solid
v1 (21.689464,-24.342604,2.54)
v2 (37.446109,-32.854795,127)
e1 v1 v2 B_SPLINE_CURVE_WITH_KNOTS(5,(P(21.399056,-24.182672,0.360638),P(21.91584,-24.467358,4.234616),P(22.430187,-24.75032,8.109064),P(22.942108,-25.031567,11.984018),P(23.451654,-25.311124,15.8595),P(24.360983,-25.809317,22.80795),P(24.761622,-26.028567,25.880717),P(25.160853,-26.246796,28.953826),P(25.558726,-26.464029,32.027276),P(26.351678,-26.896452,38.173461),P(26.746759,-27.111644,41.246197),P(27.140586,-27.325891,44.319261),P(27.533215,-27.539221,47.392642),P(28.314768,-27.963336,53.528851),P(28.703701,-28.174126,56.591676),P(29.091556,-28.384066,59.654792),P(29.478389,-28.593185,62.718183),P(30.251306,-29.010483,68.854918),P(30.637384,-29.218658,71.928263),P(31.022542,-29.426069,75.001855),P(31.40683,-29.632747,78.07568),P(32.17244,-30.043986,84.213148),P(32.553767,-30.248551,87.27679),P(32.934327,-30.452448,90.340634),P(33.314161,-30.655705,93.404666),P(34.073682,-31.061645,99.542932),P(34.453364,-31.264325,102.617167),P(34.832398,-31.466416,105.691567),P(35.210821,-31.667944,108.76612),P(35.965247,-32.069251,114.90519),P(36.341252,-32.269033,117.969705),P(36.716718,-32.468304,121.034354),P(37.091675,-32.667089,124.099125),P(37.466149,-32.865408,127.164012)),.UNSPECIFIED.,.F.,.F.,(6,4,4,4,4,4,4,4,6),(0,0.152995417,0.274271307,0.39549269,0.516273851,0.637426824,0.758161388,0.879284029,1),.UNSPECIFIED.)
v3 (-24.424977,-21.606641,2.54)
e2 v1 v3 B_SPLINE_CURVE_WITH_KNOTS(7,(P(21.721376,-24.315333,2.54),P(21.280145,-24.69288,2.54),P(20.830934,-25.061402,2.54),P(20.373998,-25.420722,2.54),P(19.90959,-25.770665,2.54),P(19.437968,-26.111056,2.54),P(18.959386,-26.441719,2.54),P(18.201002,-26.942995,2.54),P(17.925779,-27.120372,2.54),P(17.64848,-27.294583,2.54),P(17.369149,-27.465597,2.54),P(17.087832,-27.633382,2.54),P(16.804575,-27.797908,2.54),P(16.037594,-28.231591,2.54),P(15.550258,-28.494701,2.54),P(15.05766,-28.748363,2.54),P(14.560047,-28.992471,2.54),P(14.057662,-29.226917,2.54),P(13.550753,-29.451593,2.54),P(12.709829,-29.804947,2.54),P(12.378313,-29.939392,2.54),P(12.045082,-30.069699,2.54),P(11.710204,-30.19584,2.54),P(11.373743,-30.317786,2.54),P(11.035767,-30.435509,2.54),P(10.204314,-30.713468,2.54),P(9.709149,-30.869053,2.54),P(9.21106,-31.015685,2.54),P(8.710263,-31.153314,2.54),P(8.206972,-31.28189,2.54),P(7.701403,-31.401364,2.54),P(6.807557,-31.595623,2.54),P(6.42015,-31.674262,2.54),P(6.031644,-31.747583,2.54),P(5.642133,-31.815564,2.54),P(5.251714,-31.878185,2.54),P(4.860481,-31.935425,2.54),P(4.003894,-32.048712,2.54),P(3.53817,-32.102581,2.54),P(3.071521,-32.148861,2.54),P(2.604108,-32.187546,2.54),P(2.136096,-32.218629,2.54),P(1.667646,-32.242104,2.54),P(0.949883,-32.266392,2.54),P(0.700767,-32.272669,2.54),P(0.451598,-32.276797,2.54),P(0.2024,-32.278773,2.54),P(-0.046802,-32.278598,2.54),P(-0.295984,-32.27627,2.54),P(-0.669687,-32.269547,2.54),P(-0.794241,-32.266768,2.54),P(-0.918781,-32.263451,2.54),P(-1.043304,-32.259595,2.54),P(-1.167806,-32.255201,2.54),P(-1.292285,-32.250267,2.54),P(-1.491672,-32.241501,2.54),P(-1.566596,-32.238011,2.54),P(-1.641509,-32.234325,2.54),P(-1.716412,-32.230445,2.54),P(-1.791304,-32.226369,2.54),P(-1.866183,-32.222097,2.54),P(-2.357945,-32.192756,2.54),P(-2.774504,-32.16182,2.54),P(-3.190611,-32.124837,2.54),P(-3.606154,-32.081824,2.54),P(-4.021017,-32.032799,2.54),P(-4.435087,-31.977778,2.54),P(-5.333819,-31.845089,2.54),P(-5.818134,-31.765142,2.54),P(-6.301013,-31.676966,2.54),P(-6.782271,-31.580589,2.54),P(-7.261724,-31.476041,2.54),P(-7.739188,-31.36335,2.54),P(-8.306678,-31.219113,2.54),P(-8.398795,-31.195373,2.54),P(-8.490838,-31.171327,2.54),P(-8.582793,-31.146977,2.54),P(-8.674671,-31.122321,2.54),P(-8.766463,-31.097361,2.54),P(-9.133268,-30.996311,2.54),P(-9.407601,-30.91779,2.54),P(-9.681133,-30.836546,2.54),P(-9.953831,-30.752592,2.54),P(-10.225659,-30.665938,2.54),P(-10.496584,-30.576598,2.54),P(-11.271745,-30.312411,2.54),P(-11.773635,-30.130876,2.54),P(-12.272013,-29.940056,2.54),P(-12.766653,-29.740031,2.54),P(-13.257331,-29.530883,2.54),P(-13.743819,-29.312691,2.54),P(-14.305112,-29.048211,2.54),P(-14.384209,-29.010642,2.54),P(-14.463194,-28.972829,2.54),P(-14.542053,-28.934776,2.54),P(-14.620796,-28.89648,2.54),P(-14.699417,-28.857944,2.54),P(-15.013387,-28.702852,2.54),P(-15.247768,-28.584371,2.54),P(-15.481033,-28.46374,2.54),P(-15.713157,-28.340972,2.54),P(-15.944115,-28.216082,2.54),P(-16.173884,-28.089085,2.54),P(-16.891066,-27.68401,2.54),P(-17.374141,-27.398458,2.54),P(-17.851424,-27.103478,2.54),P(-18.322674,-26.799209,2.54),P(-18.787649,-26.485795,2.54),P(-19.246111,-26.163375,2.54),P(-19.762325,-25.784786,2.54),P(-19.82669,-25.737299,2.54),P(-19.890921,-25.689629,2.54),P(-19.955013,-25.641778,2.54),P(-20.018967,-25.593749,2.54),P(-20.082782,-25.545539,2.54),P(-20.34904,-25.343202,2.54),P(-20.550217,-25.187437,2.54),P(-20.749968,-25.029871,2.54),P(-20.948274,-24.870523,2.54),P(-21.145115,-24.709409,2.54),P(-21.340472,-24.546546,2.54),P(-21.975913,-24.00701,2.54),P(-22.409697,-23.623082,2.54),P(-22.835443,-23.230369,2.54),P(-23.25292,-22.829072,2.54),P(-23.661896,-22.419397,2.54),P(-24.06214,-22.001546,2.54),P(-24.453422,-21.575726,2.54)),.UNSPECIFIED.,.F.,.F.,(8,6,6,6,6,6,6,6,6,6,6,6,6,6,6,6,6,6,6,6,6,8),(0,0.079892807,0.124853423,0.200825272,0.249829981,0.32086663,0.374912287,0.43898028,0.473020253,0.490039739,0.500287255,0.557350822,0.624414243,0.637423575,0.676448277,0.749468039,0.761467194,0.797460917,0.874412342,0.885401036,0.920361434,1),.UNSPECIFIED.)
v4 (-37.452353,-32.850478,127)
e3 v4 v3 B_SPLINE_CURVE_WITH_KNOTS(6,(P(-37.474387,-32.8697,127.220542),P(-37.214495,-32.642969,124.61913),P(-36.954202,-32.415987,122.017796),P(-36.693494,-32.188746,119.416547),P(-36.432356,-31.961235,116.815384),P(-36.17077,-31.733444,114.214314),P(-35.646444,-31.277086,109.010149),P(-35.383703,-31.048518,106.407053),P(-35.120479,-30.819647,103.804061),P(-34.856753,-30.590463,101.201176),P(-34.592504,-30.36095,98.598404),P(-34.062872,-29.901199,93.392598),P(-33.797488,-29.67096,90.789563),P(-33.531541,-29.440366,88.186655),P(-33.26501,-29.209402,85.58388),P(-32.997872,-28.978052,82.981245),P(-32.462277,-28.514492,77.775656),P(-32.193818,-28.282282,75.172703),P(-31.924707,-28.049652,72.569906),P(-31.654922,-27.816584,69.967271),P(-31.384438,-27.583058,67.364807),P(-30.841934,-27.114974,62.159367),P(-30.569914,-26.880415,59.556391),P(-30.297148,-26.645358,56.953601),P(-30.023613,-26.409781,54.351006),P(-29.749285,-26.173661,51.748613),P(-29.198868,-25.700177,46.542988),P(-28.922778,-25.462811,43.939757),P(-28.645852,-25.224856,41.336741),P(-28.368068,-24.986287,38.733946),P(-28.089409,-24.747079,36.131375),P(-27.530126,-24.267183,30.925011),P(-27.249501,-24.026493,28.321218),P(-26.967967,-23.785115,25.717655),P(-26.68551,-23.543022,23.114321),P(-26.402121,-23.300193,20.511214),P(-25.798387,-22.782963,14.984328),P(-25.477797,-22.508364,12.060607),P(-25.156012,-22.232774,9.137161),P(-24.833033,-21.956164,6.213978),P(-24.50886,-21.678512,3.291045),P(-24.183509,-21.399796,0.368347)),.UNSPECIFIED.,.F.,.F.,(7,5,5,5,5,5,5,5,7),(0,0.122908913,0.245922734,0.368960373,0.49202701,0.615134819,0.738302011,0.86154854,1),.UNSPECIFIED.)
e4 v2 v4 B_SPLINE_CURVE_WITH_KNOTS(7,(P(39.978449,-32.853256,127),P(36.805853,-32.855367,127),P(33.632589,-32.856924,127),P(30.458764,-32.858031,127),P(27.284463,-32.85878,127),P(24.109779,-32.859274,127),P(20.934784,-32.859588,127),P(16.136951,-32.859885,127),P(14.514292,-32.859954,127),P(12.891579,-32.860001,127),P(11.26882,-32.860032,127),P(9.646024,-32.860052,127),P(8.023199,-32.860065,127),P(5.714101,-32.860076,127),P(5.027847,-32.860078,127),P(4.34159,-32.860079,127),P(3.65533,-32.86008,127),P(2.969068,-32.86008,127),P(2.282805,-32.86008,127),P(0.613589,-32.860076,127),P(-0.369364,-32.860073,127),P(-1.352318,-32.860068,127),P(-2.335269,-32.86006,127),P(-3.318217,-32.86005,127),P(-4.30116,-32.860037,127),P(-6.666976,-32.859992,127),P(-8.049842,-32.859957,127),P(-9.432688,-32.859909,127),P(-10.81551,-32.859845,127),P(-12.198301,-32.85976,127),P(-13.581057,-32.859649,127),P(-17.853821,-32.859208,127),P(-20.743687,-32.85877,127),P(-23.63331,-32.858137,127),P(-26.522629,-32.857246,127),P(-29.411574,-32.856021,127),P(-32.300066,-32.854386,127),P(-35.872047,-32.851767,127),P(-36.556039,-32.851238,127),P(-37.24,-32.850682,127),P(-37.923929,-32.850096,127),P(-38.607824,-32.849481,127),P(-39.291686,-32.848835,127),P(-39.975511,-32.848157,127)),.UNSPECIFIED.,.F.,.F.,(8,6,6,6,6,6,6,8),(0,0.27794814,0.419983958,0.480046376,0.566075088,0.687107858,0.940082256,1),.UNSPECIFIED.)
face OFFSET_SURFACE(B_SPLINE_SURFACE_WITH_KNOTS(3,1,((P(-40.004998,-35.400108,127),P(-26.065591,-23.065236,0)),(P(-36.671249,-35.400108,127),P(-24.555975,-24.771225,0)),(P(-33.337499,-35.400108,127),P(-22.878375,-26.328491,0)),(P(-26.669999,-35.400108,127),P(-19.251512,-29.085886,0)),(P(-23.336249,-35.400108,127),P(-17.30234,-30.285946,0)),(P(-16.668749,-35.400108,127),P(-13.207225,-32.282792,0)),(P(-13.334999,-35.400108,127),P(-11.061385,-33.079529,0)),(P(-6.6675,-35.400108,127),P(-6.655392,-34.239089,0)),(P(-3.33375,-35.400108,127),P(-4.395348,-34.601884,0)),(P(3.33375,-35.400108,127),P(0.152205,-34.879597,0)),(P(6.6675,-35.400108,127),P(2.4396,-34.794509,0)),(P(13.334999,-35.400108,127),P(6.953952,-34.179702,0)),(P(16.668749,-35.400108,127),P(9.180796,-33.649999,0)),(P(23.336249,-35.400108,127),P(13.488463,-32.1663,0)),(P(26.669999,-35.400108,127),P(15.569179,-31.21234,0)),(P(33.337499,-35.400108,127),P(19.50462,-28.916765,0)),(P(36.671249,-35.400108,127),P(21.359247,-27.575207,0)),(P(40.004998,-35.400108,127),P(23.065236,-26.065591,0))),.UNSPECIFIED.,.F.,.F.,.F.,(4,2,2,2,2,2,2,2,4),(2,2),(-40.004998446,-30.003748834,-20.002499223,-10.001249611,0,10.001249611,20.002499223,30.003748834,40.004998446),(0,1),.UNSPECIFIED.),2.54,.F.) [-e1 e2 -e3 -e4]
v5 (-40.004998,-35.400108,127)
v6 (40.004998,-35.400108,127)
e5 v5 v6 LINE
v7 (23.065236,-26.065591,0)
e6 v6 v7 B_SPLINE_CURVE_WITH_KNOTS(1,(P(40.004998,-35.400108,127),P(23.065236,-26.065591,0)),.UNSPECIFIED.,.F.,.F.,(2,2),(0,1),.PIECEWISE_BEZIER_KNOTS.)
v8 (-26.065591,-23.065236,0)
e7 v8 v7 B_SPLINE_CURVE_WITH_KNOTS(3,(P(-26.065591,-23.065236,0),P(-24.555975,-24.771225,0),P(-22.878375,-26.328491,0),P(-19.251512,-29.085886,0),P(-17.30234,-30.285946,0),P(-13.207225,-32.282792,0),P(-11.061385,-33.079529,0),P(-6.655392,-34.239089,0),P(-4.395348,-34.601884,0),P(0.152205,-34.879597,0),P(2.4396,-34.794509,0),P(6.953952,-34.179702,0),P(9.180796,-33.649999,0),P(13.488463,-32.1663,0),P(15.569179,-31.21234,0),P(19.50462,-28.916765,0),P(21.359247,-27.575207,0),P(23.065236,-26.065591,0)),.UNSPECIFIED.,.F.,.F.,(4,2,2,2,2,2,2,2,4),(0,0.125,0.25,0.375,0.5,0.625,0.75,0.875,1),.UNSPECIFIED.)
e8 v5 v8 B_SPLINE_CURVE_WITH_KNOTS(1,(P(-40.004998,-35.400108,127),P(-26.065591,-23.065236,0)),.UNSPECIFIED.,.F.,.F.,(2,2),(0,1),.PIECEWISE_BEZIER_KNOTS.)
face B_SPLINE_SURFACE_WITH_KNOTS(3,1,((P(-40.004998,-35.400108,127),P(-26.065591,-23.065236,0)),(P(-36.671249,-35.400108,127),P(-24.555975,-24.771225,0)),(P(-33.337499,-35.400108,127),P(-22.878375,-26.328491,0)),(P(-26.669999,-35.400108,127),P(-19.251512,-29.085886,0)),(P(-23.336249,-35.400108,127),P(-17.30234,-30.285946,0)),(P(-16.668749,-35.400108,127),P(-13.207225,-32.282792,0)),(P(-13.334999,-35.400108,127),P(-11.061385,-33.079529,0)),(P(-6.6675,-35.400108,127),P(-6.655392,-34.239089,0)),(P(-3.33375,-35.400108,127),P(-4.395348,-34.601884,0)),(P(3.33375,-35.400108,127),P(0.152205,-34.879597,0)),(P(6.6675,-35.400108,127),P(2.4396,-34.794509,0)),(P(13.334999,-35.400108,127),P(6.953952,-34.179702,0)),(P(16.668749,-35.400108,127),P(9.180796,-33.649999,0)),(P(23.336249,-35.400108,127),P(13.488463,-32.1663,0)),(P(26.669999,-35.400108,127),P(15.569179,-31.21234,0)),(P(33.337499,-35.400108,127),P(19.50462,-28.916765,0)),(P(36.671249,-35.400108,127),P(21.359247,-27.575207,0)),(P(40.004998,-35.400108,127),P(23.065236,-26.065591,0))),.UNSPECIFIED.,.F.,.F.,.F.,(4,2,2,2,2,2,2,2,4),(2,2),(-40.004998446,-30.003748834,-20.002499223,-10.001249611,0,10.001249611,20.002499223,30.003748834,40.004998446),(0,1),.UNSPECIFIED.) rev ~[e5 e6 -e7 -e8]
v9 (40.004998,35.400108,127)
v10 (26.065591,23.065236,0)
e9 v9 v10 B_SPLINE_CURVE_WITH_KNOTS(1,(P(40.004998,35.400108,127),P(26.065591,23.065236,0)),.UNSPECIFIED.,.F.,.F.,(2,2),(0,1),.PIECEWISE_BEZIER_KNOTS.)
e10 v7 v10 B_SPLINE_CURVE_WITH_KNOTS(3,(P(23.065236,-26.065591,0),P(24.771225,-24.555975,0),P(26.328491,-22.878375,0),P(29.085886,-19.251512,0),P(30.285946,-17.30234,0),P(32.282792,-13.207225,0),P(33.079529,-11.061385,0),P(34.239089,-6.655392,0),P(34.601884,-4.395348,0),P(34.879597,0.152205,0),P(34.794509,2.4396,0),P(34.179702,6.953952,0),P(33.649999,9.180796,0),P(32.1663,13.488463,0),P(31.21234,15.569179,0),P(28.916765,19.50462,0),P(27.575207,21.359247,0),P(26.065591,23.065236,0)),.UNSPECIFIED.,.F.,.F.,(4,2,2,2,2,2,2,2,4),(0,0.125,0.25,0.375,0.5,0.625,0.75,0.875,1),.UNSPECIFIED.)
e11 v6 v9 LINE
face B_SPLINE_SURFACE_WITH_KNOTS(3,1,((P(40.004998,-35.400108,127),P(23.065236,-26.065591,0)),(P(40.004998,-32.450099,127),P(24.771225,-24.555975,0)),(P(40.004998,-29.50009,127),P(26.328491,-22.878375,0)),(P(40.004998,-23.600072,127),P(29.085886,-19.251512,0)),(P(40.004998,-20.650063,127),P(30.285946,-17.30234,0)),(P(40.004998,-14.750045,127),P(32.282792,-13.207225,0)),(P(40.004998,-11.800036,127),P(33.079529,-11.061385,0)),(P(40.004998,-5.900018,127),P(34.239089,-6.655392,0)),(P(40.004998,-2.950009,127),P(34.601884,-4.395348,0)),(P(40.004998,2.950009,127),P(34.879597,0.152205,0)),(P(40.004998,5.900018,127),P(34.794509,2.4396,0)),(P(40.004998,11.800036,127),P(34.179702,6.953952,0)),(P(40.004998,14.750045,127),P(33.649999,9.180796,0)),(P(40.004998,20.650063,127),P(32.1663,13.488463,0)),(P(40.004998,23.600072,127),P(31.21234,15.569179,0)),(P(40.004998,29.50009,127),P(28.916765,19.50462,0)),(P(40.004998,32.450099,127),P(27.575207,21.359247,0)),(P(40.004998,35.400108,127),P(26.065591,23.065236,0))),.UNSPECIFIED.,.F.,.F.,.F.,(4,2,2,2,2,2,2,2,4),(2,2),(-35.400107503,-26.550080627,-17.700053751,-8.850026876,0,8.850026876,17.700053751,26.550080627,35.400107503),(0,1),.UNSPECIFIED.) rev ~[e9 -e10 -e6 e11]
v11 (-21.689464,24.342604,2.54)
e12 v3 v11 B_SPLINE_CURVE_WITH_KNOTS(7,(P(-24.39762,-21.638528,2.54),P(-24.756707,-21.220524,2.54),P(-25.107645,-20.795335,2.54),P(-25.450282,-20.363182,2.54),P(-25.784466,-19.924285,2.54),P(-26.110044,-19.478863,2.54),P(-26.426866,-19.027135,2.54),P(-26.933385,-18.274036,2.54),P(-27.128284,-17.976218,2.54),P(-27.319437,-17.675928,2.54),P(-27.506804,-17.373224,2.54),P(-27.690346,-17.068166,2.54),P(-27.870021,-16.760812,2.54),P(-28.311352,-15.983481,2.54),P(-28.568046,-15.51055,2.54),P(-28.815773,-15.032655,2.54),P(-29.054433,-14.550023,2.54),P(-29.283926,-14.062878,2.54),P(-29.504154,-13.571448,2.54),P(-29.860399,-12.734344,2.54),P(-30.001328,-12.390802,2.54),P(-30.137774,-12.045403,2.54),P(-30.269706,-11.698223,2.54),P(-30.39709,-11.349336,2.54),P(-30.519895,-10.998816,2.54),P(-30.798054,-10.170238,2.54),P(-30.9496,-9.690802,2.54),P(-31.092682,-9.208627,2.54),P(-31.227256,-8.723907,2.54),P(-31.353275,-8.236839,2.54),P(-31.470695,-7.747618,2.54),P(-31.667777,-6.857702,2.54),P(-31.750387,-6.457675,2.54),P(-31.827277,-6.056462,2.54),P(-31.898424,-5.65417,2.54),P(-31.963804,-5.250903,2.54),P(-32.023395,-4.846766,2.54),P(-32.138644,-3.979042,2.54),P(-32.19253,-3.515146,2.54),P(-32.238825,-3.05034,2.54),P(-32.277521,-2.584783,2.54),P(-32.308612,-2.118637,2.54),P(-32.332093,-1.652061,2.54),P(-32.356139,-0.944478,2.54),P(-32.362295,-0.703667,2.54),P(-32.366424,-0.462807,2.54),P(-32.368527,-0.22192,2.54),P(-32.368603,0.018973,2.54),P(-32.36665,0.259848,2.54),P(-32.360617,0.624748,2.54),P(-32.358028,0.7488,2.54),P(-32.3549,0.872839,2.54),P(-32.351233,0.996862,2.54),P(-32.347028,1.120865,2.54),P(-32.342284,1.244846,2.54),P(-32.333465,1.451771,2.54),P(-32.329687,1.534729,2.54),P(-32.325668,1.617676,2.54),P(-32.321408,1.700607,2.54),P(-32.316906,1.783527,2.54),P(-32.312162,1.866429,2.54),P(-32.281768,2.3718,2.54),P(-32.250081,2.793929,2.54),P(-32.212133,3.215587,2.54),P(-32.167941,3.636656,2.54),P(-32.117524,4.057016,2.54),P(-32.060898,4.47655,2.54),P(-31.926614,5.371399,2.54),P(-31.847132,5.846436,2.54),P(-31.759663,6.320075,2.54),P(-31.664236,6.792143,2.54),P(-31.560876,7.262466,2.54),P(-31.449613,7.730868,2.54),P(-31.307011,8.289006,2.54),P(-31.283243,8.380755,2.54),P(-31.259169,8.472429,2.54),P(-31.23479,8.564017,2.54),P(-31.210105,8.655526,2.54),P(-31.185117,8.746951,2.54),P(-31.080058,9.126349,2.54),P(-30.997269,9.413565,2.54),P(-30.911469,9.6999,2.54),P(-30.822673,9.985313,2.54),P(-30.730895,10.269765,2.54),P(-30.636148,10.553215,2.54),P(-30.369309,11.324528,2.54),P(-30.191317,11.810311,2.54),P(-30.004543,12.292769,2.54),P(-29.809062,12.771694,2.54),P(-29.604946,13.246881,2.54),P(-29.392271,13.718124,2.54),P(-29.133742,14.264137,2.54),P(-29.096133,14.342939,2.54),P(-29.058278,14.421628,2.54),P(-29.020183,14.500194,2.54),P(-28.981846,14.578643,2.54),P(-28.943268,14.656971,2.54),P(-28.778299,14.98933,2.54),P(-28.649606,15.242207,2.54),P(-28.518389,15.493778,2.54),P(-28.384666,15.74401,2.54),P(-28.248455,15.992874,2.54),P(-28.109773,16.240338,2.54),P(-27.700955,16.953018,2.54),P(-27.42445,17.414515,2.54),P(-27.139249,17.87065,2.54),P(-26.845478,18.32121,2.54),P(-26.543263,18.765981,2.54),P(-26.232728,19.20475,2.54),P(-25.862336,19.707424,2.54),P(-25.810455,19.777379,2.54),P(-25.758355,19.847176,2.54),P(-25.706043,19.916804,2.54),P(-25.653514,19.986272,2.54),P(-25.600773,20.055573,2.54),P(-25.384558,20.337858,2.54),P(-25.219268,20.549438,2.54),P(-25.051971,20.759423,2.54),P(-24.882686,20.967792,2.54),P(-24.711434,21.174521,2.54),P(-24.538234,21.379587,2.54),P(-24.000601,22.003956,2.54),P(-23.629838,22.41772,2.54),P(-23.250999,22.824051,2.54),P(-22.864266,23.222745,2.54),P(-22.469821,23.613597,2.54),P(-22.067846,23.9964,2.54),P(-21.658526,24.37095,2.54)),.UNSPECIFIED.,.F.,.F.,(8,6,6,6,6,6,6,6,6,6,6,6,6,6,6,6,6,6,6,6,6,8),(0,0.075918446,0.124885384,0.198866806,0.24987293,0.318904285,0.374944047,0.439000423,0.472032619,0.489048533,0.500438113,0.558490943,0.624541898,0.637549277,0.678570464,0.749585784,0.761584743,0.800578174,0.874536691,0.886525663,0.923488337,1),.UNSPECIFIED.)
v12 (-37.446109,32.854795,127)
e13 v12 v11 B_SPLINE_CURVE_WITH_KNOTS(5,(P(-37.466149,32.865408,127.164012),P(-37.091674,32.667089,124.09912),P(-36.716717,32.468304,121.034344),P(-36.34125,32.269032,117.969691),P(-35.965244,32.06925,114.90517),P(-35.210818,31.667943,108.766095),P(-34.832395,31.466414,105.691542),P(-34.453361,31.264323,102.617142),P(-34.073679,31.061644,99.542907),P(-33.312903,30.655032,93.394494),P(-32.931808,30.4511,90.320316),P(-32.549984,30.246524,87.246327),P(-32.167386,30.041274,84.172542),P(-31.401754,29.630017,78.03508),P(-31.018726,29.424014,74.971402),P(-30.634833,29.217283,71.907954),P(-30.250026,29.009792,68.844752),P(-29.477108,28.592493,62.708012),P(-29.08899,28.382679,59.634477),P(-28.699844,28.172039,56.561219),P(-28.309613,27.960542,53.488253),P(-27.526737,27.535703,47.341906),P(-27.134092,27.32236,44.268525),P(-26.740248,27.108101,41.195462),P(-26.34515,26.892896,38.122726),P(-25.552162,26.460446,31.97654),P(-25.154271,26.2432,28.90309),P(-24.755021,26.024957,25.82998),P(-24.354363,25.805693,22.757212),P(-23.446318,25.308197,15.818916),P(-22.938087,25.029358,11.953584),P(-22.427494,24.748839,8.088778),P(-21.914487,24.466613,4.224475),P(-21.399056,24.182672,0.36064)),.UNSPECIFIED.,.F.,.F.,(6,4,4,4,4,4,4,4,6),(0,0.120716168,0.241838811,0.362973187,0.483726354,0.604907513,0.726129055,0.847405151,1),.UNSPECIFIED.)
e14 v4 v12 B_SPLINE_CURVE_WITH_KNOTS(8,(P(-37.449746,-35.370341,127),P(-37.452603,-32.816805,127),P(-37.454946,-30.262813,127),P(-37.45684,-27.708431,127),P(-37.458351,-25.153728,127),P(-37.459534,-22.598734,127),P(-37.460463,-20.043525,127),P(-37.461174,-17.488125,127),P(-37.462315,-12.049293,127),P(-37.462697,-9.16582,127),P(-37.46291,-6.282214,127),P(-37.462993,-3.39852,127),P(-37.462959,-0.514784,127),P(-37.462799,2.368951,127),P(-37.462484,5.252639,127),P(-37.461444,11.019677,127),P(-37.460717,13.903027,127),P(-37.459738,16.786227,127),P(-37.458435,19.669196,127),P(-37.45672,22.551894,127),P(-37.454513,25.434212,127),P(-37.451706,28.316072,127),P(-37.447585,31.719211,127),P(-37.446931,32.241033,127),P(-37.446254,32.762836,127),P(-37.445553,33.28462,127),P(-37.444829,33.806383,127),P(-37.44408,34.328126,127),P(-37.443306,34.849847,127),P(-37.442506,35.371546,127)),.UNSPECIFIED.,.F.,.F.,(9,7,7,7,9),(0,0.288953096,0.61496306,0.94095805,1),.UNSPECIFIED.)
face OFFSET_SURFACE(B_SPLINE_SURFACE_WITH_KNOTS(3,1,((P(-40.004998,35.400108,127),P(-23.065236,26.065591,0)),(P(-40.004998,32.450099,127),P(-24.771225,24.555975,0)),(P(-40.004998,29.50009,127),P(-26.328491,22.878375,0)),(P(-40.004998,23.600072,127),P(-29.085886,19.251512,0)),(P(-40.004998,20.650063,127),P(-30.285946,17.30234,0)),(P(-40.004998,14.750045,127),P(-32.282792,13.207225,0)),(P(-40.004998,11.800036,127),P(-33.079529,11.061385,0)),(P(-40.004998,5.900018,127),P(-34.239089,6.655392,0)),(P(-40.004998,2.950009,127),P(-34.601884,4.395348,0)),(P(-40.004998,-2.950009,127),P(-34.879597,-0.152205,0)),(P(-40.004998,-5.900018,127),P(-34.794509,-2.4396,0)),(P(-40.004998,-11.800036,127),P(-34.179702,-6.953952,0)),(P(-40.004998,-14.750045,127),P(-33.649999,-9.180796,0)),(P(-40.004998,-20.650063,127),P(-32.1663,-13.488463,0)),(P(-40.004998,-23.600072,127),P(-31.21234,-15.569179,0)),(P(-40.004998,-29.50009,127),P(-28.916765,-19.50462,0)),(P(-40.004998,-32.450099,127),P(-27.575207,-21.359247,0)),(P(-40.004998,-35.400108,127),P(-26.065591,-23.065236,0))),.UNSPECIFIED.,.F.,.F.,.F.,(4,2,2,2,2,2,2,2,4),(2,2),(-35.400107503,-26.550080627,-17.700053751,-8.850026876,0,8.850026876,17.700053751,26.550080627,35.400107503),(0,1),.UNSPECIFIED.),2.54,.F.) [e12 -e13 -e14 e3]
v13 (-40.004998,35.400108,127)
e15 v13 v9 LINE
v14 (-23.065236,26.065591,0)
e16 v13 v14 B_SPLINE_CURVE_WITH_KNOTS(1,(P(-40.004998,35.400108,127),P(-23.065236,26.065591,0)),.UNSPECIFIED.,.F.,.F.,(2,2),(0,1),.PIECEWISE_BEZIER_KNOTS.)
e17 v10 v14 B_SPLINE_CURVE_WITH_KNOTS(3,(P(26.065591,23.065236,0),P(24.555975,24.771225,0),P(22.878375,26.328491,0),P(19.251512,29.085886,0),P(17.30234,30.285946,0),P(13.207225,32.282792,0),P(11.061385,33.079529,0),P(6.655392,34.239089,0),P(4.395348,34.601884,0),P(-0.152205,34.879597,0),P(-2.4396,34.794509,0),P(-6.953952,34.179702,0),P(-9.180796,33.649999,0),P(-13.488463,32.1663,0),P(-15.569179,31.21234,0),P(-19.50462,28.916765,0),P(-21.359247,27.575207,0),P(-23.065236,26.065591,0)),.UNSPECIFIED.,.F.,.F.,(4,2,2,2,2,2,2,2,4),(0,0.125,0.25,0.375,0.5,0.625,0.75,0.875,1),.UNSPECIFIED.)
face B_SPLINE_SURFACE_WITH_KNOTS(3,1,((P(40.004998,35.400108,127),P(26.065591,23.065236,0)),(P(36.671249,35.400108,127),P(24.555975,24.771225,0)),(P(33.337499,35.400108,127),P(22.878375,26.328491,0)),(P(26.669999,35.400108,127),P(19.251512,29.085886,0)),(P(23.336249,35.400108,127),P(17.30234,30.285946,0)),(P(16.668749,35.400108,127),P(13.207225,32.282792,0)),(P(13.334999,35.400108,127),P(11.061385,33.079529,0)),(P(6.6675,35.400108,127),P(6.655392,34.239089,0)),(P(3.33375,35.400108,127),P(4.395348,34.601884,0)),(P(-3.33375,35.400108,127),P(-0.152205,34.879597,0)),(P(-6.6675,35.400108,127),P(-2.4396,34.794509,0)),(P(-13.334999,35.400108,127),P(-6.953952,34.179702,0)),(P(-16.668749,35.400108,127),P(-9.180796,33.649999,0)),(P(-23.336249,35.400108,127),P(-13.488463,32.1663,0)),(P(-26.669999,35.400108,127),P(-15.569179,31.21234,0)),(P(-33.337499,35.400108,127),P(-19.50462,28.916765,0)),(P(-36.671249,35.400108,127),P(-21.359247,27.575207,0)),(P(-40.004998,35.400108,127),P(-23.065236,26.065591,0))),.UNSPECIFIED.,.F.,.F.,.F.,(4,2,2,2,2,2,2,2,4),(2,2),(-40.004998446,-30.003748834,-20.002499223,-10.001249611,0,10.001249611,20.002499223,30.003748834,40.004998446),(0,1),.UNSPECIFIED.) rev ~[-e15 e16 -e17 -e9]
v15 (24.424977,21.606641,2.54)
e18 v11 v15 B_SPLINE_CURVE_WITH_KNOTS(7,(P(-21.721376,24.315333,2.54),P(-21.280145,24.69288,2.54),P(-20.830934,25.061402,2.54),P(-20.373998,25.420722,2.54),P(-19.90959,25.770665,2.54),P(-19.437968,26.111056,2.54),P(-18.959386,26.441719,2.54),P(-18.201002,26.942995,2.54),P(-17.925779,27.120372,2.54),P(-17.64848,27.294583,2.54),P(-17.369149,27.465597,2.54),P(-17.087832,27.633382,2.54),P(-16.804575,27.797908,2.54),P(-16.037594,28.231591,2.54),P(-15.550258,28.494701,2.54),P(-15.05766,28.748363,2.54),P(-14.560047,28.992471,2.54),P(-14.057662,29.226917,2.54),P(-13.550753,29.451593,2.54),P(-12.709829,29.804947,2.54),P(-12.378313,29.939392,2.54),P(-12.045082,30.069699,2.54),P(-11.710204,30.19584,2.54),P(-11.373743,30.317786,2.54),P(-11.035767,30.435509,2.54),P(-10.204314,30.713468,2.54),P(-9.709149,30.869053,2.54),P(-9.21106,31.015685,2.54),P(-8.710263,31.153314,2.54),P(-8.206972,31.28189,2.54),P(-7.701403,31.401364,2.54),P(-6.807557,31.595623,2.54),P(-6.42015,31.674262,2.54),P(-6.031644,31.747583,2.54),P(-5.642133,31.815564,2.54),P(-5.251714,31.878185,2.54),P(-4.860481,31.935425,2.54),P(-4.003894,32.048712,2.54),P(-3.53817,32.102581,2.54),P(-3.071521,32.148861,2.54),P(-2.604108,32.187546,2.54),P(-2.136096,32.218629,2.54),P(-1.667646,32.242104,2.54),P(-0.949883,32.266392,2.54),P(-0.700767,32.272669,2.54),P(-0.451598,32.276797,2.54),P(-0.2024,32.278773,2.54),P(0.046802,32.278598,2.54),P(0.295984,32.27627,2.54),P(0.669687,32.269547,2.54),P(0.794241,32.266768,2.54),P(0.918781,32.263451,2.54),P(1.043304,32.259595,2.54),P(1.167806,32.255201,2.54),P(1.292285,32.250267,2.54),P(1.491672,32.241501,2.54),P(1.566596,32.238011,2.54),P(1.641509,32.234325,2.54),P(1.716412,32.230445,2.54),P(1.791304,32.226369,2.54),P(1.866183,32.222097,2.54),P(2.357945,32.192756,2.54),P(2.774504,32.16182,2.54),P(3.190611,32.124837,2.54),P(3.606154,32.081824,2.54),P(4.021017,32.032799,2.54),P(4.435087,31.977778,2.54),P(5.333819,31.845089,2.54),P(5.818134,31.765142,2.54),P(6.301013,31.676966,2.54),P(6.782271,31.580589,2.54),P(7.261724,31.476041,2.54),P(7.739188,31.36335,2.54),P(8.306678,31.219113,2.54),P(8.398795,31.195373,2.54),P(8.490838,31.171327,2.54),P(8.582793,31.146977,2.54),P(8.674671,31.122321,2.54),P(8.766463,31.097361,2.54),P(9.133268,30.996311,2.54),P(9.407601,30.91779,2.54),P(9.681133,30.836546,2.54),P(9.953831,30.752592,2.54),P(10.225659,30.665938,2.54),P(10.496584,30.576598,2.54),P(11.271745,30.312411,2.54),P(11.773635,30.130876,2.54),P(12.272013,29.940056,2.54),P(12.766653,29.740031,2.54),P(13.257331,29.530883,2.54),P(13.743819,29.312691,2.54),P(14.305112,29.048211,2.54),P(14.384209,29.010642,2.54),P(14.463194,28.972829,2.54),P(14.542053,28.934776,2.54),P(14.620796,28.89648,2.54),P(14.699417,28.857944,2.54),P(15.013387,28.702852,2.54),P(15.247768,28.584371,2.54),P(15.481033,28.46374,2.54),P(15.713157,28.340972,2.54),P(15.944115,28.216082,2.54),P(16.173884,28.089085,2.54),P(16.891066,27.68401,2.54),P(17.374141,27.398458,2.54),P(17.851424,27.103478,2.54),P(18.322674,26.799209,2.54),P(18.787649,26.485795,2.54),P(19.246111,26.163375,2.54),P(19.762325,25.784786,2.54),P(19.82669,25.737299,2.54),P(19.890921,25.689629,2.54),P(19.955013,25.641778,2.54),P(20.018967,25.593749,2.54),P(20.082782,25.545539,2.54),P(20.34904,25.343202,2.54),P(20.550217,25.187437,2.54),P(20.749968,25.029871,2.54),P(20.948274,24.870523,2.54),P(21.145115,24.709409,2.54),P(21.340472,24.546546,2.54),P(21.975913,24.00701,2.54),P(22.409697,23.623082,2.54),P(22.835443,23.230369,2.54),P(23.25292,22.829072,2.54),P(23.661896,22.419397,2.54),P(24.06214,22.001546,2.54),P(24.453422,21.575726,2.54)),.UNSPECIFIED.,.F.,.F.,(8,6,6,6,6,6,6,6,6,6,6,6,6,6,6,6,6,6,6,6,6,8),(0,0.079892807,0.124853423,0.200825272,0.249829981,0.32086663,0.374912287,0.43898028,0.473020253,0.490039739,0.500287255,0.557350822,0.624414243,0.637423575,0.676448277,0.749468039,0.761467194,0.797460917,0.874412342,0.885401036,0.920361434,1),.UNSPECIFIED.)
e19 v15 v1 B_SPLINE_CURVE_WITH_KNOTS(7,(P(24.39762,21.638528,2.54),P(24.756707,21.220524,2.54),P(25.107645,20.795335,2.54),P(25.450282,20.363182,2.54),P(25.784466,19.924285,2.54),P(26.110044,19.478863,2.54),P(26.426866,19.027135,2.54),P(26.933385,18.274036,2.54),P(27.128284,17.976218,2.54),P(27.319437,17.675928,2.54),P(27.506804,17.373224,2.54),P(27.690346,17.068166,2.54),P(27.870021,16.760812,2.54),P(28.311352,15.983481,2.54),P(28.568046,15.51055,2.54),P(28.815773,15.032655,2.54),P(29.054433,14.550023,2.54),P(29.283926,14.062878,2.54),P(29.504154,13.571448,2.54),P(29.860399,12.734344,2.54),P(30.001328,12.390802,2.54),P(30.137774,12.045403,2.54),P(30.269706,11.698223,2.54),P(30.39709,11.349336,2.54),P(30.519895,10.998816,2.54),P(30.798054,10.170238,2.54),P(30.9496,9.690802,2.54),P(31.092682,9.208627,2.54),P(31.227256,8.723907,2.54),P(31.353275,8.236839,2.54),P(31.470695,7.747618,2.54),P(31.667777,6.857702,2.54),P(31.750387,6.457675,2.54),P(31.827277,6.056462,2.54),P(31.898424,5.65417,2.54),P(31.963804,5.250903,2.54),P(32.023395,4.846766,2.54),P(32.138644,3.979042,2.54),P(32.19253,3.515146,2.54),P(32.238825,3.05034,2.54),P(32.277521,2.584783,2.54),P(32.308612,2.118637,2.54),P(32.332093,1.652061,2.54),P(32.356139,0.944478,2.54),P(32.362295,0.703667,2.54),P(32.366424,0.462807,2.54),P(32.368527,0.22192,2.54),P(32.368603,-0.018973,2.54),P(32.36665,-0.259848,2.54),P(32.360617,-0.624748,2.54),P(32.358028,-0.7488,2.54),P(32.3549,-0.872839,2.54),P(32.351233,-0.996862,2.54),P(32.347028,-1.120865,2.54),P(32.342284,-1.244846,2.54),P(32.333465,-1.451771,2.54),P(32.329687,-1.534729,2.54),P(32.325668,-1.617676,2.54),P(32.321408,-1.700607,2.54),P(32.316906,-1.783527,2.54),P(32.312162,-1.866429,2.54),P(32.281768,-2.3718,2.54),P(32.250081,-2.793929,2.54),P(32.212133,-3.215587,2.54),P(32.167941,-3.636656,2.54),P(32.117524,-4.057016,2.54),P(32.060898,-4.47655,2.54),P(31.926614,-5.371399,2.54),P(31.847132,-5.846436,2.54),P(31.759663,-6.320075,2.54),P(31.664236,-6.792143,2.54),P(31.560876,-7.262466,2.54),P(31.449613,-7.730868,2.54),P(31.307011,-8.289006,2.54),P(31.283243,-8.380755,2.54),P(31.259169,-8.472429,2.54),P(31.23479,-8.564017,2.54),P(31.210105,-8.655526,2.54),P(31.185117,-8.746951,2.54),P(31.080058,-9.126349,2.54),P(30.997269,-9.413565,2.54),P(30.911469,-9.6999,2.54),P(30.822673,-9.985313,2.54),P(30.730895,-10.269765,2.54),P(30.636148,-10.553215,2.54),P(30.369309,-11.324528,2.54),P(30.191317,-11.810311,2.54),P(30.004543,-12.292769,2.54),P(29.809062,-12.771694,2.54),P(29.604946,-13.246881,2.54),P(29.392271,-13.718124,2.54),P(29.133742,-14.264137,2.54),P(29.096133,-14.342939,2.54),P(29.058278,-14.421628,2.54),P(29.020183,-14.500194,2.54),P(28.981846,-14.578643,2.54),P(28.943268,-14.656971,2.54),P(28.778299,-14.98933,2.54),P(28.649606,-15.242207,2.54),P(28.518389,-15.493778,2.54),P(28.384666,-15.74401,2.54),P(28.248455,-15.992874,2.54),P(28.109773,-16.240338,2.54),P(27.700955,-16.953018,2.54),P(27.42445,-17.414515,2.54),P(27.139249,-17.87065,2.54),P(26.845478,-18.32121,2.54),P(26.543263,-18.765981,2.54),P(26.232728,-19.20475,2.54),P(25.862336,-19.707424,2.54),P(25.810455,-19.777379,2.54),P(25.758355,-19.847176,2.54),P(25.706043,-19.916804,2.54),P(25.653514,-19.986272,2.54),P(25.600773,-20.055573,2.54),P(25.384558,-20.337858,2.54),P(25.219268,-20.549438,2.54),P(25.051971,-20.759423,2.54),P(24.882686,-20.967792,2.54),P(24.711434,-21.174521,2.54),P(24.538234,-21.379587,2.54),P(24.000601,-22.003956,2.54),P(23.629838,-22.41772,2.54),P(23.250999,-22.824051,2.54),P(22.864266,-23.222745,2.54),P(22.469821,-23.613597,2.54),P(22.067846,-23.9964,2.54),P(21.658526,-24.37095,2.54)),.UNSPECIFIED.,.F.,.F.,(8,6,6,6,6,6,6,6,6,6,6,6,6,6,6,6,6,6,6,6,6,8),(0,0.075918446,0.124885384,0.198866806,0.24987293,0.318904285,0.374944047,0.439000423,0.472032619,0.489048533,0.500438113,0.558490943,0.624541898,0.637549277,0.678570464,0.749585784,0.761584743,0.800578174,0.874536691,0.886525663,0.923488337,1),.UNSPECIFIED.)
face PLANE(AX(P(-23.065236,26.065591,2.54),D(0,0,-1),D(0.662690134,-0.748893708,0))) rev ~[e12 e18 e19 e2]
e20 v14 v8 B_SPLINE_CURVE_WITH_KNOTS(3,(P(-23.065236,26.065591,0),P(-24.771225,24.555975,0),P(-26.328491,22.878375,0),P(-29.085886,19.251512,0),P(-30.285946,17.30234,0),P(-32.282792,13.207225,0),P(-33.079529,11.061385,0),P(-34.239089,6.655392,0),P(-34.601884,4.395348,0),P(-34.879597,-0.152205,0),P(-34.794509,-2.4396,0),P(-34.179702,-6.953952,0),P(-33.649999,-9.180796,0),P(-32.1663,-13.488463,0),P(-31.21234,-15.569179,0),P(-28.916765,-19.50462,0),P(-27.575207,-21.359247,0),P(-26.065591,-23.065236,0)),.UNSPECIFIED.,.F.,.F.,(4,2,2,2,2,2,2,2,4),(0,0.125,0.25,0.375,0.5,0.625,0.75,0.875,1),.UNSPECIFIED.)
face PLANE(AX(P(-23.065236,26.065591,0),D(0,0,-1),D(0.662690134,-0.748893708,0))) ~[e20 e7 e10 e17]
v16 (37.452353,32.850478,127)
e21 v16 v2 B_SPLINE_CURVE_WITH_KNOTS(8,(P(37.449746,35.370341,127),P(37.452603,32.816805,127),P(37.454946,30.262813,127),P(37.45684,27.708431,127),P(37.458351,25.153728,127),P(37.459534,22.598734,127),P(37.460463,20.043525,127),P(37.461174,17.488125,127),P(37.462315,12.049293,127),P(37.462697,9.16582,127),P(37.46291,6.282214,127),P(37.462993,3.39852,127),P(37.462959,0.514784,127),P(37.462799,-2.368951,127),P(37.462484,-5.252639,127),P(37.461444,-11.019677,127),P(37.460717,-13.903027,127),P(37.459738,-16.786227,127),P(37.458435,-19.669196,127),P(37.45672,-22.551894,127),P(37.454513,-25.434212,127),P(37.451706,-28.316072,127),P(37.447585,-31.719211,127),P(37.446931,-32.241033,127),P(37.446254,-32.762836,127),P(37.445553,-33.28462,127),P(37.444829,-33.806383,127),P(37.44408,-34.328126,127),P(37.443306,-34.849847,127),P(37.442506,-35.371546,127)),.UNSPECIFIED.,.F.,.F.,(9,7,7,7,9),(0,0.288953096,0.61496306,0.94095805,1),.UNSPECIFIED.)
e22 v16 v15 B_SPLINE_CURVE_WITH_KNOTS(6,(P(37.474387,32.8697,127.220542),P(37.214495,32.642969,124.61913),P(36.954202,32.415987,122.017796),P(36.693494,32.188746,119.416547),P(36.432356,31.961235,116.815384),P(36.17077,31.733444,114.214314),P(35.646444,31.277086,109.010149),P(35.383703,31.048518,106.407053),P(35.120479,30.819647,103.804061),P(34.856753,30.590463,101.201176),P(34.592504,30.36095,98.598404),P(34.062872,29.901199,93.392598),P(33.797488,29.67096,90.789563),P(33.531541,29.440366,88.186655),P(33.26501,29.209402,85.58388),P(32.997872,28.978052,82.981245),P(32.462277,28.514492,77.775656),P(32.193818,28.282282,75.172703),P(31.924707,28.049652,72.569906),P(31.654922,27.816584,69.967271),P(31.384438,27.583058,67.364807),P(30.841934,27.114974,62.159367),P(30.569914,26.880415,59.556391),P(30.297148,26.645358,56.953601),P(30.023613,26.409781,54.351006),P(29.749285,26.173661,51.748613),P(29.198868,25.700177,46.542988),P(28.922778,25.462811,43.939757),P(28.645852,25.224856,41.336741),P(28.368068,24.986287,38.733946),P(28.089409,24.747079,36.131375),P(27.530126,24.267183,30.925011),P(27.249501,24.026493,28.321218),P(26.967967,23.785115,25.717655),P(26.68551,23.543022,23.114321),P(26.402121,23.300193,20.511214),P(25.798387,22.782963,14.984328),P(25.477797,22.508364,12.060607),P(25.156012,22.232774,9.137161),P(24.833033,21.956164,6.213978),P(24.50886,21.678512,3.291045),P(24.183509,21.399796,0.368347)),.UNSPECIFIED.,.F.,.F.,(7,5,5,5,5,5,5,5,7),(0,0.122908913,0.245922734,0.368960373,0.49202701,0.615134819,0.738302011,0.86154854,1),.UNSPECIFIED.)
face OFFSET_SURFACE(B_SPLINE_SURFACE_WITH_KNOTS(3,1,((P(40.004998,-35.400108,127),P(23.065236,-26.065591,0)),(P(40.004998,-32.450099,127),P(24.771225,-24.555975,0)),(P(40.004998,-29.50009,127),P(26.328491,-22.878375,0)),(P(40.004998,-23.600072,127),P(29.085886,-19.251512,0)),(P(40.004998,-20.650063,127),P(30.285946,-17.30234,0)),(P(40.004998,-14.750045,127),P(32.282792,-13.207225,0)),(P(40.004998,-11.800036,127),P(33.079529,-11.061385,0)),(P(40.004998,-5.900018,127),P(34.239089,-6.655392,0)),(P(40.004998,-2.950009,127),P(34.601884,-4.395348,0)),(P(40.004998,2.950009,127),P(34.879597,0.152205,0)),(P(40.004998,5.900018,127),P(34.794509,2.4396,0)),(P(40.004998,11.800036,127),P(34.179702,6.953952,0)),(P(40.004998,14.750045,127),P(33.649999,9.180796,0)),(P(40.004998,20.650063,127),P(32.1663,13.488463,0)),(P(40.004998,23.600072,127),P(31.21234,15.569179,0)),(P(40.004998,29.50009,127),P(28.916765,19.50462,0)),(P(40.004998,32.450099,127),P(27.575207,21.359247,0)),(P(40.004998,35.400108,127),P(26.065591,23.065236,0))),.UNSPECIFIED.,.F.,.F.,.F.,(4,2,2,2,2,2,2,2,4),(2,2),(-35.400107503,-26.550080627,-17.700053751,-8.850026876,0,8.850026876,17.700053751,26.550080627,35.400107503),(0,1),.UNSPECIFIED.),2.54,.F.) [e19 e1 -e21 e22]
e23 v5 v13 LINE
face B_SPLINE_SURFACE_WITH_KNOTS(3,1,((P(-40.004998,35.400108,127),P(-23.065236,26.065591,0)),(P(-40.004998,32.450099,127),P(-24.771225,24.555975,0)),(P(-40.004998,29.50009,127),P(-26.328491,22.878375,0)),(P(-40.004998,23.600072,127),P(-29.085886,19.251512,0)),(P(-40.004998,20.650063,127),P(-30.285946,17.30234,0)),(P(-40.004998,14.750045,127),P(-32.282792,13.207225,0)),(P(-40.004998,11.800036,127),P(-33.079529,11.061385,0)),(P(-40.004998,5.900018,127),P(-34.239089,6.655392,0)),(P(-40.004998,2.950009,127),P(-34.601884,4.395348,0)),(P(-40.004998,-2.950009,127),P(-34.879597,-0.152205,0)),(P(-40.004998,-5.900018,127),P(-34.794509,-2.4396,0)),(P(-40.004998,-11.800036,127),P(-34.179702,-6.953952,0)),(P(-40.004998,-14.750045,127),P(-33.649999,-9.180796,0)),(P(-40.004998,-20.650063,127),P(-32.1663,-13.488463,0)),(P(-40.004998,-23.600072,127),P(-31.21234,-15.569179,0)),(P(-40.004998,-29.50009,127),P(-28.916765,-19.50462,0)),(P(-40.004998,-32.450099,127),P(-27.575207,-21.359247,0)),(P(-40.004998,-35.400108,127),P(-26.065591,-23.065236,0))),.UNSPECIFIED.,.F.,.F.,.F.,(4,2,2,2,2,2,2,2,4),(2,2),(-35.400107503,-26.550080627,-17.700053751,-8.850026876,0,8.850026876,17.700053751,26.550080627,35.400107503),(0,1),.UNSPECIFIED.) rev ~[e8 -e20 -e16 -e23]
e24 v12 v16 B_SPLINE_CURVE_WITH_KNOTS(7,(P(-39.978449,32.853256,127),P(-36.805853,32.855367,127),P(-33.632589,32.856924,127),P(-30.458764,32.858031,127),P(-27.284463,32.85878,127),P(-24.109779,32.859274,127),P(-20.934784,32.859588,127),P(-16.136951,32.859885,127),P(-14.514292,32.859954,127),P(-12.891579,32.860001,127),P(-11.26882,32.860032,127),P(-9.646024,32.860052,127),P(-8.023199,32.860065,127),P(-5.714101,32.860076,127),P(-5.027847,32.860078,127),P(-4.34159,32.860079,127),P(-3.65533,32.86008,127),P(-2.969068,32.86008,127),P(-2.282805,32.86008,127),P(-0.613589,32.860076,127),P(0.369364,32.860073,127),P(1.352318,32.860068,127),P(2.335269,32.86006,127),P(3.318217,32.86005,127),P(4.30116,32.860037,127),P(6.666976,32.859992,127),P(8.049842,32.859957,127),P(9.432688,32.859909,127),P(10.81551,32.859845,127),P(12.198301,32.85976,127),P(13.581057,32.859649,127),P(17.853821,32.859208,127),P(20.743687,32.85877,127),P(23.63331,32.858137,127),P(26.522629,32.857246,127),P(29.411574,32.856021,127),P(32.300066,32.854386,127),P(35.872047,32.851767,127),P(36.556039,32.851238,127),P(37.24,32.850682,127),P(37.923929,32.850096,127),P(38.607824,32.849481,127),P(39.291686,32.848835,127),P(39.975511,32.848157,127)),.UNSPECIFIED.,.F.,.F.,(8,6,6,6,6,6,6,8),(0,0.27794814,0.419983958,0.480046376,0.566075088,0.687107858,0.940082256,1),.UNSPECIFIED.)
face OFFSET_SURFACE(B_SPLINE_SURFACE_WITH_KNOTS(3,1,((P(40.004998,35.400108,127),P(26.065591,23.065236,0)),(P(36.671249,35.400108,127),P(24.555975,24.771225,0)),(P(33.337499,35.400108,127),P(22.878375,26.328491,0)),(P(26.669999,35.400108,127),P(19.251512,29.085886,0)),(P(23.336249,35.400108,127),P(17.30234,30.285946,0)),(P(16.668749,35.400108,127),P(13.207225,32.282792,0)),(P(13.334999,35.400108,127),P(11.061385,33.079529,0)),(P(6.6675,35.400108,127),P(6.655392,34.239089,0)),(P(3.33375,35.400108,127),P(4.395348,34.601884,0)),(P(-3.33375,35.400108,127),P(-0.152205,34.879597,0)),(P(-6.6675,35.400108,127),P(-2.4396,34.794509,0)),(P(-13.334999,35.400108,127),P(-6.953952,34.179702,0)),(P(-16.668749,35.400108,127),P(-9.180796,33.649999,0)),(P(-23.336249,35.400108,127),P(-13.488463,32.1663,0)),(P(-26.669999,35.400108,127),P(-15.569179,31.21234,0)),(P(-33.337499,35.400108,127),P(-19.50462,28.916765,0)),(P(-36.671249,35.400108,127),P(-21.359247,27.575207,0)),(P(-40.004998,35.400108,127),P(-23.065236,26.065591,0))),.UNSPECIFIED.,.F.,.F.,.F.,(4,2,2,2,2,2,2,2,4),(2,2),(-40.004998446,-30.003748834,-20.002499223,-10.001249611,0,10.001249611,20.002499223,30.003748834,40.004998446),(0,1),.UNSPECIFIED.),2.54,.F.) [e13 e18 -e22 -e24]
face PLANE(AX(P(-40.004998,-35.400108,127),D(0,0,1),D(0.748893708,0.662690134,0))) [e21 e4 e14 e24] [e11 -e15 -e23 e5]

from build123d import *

# Parameters (mm, degrees)
F2_W = 80.009996891
F2_H = 70.8002150059
F4_T = 2.54


# Not quite as in the source:
# - the arcs of a loft's sections are written as splines that run evenly, so that the points pair up as in the source's solid
# - a shell that OpenCascade refuses in one call is made with other operations: the cavity is built on its own and cut out


with BuildPart() as f3:
    # F2 (on offset) → F3 section 0
    with BuildSketch(Plane.XY.offset(127)):
        Rectangle(F2_W, F2_H)
    # F0 (on Top) → F3 section 1
    with BuildSketch(Plane.XY):
        with BuildLine():
            add(Edge.make_bspline(
                [(26.065590987, 23.0652358186), (24.5559748328, 24.7712247593), (22.8783749167, 26.3284909791), (19.2515124469, 29.085885659), (17.3023395745, 30.2859459372), (13.2072252341, 32.2827922844), (11.0613850258, 33.0795289775), (6.6553917622, 34.2390893068), (4.3953476538, 34.6018842705), (-0.1522046827, 34.8795973285), (-2.4396004636, 34.7945085558), (-6.953951987, 34.1797019856), (-9.1807961033, 33.6499993904), (-13.4884628163, 32.1662998637), (-15.5691788974, 31.2123396195), (-19.5046195839, 28.916764877), (-21.3592468778, 27.5752071412), (-23.0652358186, 26.065590987)],
                knots=[0, 0, 0, 0, 0.125, 0.125, 0.25, 0.25, 0.375, 0.375, 0.5, 0.5, 0.625, 0.625, 0.75, 0.75, 0.875, 0.875, 1, 1, 1, 1], degree=3))
            add(Edge.make_bspline(
                [(-23.0652358186, 26.065590987), (-24.7712247593, 24.5559748328), (-26.3284909791, 22.8783749167), (-29.085885659, 19.2515124469), (-30.2859459372, 17.3023395745), (-32.2827922844, 13.2072252341), (-33.0795289775, 11.0613850258), (-34.2390893068, 6.6553917622), (-34.6018842705, 4.3953476538), (-34.8795973285, -0.1522046827), (-34.7945085558, -2.4396004636), (-34.1797019856, -6.953951987), (-33.6499993904, -9.1807961033), (-32.1662998637, -13.4884628163), (-31.2123396195, -15.5691788974), (-28.916764877, -19.5046195839), (-27.5752071412, -21.3592468778), (-26.065590987, -23.0652358186)],
                knots=[0, 0, 0, 0, 0.125, 0.125, 0.25, 0.25, 0.375, 0.375, 0.5, 0.5, 0.625, 0.625, 0.75, 0.75, 0.875, 0.875, 1, 1, 1, 1], degree=3))
            add(Edge.make_bspline(
                [(-26.065590987, -23.0652358186), (-24.5559748328, -24.7712247593), (-22.8783749167, -26.3284909791), (-19.2515124469, -29.085885659), (-17.3023395745, -30.2859459372), (-13.2072252341, -32.2827922844), (-11.0613850258, -33.0795289775), (-6.6553917622, -34.2390893068), (-4.3953476538, -34.6018842705), (0.1522046827, -34.8795973285), (2.4396004636, -34.7945085558), (6.953951987, -34.1797019856), (9.1807961033, -33.6499993904), (13.4884628163, -32.1662998637), (15.5691788974, -31.2123396195), (19.5046195839, -28.916764877), (21.3592468778, -27.5752071412), (23.0652358186, -26.065590987)],
                knots=[0, 0, 0, 0, 0.125, 0.125, 0.25, 0.25, 0.375, 0.375, 0.5, 0.5, 0.625, 0.625, 0.75, 0.75, 0.875, 0.875, 1, 1, 1, 1], degree=3))
            add(Edge.make_bspline(
                [(23.0652358186, -26.065590987), (24.7712247593, -24.5559748328), (26.3284909791, -22.8783749167), (29.085885659, -19.2515124469), (30.2859459372, -17.3023395745), (32.2827922844, -13.2072252341), (33.0795289775, -11.0613850258), (34.2390893068, -6.6553917622), (34.6018842705, -4.3953476538), (34.8795973285, 0.1522046827), (34.7945085558, 2.4396004636), (34.1797019856, 6.953951987), (33.6499993904, 9.1807961033), (32.1662998637, 13.4884628163), (31.2123396195, 15.5691788974), (28.916764877, 19.5046195839), (27.5752071412, 21.3592468778), (26.065590987, 23.0652358186)],
                knots=[0, 0, 0, 0, 0.125, 0.125, 0.25, 0.25, 0.375, 0.375, 0.5, 0.5, 0.625, 0.625, 0.75, 0.75, 0.875, 0.875, 1, 1, 1, 1], degree=3))
        make_face()
    loft(ruled=True)

    # F4: shell of thickness 2.54, made by hand


with BuildPart() as f4_core1:
    # F4_t2: copy of F3
    add(f3.part)

    # the walls: a layer under each face that stays
    f4_faces = [f4_core1.faces().sort_by_distance(p)[0] for p in [
        (37.3728696225, -1.0607857428, 63.5),
        (1.0607857428, 35.0704241512, 63.5),
        (-37.3728696225, 1.0607857428, 63.5),
        (-1.0607857428, -35.0704241512, 63.5),
        (0, 0, 0),
    ]]
    thicken(f4_faces, amount=-F4_T, mode=Mode.SUBTRACT)


with BuildPart() as f3_1:
    add(f3.part)

    # what is left inside the walls is the cavity
    f4_cavity = [f4_core1.part.solids().sort_by_distance(p)[0] for p in [
        (-0.656082, -32.618968, 85.395704),
    ]]
    add(f4_cavity, mode=Mode.SUBTRACT)


solid = f3_1.part
